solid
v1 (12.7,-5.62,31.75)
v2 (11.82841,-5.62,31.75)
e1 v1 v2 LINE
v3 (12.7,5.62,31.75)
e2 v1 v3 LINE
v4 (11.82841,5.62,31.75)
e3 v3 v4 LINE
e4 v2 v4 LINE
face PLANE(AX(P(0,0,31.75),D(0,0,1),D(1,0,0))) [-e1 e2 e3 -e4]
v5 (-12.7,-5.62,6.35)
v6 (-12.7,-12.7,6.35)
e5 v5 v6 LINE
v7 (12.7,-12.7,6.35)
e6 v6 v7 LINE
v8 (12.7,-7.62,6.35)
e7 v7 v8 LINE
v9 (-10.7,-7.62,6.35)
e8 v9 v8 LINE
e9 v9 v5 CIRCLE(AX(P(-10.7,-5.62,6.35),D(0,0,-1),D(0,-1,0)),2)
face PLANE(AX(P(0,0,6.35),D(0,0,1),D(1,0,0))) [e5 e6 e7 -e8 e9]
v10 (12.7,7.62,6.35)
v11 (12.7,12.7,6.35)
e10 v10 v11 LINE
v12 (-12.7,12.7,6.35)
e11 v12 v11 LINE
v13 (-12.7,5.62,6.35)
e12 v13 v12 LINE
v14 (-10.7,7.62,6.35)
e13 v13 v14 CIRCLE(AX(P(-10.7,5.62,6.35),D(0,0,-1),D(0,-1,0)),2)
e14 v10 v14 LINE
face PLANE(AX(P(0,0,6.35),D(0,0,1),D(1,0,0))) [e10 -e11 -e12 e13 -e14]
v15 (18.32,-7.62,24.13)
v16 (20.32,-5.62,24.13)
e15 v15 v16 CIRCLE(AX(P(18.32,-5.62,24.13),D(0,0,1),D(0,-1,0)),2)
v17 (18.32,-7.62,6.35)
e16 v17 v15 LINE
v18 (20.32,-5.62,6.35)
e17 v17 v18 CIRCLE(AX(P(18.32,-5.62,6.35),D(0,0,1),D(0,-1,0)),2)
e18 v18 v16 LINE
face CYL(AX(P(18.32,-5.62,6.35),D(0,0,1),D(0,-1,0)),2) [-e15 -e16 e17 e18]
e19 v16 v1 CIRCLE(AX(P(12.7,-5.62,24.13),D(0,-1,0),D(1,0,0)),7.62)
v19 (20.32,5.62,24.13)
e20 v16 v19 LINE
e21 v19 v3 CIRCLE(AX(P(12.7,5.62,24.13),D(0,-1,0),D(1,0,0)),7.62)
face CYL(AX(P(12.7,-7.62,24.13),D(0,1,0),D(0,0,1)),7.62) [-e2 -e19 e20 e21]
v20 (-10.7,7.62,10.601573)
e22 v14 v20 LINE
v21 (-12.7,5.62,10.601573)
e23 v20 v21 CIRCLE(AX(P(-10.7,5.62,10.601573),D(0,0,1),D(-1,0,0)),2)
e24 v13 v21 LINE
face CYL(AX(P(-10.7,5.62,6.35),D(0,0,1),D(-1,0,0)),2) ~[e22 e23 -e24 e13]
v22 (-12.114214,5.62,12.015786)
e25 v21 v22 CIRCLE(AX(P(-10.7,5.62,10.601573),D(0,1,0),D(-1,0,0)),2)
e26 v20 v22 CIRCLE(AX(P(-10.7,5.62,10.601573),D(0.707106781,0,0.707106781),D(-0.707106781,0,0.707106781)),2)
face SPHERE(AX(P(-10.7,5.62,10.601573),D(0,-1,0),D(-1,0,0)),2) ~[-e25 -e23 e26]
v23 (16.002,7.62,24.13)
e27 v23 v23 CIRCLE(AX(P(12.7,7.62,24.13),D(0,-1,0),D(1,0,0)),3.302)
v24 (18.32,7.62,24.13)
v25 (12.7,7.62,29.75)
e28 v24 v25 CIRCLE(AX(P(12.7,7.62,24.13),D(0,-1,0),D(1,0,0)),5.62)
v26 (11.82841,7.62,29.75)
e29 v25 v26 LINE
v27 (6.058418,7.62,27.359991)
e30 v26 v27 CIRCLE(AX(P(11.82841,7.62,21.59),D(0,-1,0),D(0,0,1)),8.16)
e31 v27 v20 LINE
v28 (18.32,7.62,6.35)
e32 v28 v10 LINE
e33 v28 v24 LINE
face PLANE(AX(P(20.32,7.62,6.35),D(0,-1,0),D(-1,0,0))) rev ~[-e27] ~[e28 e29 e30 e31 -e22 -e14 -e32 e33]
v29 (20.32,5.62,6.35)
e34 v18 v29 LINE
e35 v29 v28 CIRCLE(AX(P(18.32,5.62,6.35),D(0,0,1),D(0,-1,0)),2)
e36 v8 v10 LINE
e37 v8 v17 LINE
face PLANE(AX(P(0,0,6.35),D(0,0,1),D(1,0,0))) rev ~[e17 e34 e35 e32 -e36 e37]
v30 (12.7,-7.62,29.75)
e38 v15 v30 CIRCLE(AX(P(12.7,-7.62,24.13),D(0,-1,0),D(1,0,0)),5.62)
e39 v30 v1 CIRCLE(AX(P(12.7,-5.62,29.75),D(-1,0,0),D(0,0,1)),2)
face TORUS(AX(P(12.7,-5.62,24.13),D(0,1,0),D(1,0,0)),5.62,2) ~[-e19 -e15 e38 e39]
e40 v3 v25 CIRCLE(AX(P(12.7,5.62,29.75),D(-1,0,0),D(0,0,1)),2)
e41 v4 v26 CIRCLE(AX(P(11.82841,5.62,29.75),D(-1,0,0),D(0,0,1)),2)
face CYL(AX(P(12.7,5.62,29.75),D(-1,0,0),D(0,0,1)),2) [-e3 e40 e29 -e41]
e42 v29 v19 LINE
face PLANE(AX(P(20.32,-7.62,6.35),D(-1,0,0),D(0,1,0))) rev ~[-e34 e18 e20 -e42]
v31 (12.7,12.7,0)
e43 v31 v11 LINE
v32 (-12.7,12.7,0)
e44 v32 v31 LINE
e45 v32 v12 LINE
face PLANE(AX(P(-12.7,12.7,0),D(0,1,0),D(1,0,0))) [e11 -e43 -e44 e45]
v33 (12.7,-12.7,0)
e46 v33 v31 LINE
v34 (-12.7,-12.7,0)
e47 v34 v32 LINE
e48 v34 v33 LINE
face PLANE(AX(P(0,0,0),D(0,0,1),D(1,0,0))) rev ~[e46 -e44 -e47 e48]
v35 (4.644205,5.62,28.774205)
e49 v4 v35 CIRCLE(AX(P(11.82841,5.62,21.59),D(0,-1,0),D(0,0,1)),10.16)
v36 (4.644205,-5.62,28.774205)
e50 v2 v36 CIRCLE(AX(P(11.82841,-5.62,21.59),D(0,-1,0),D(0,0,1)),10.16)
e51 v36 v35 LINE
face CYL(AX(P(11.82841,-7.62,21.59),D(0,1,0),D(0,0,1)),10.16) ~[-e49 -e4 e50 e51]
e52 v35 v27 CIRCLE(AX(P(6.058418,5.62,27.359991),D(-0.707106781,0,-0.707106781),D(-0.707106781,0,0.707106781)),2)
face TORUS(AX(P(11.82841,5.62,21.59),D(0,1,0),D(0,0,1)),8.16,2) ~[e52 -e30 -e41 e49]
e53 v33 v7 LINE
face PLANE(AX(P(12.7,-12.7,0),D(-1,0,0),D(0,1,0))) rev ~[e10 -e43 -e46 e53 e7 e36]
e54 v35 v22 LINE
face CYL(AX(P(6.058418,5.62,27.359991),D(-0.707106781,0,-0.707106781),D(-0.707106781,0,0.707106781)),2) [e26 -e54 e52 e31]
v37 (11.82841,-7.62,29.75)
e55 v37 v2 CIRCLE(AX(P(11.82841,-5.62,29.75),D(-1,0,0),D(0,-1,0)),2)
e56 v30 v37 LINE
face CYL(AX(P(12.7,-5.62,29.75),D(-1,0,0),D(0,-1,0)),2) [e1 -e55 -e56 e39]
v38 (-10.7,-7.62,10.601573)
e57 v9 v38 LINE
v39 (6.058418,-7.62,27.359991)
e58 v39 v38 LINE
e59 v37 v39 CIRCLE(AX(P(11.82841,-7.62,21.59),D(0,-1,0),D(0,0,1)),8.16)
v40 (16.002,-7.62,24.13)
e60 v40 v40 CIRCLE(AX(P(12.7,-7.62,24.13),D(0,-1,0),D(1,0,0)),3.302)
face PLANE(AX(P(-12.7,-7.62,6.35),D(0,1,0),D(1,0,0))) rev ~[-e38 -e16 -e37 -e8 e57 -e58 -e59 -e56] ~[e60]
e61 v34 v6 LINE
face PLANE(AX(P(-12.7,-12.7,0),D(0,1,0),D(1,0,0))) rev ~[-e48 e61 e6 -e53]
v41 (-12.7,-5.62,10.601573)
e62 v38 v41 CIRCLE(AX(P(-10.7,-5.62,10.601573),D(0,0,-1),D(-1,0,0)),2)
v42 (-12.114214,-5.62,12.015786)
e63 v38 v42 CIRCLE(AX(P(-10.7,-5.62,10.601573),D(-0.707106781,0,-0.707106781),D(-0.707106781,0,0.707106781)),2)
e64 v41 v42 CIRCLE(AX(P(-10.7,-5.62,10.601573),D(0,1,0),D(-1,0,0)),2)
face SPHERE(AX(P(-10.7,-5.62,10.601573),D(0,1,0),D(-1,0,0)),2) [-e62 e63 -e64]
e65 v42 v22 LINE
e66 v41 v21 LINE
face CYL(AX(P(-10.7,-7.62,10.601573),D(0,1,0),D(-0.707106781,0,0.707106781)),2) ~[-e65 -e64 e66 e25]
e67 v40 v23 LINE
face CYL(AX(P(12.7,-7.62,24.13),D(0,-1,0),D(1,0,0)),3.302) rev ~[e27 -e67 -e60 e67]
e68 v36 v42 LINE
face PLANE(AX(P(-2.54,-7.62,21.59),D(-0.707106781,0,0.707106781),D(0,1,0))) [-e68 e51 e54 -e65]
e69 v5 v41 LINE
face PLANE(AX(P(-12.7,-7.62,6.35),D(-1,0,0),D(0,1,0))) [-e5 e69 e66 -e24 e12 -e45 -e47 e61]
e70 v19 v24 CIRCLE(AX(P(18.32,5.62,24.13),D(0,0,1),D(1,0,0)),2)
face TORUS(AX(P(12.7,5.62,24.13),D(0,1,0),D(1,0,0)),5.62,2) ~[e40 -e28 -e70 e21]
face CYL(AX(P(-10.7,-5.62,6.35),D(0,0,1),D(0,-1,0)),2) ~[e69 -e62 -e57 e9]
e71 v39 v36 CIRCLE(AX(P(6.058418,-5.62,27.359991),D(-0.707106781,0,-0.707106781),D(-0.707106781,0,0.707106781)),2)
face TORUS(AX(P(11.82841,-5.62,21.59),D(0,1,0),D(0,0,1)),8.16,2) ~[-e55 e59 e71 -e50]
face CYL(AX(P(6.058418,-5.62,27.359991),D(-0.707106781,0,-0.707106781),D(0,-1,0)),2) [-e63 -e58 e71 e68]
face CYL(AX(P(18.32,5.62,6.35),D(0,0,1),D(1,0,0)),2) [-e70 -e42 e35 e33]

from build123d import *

# Parameters (mm, degrees)
F0_W     = 25.4
F0_H     = 25.4
F1_DEPTH = 6.35
F2_W     = 25.4
F2_H     = 15.24
F2_W_2   = 7.62
F3_DEPTH = 25.4
F4_R     = 7.62
F5_SIZE  = 20.32
F6_R     = 10.16
F7_R     = 3.302
F8_DEPTH = 20.321
F9_R     = 2


with BuildPart() as f1:
    # F0 (on Top) → F1 (new body)
    with BuildSketch(Plane.XY):
        Rectangle(F0_W, F0_H)
    extrude(amount=F1_DEPTH)

    # F2 (on face) → F3 (join)
    with BuildSketch(Plane.XY.offset(6.35)):
        Rectangle(F2_W, F2_H)
        with Locations((16.51, 0)):
            Rectangle(F2_W_2, F2_H)
    extrude(amount=F3_DEPTH)

    # F4
    f4_edges = [f1.edges().sort_by_distance(p)[0] for p in [
        (20.32, 0, 31.75),
    ]]
    fillet(f4_edges, radius=F4_R)

    # F5
    f5_edges = [f1.edges().sort_by_distance(p)[0] for p in [
        (-12.7, 0, 31.75),
    ]]
    chamfer(f5_edges, length=F5_SIZE)

    # F6
    f6_edges = [f1.edges().sort_by_distance(p)[0] for p in [
        (7.62, 0, 31.75),
    ]]
    fillet(f6_edges, radius=F6_R)

    # F7 (on face) → F8 (cut, through all)
    with BuildSketch(Plane.XZ.offset(7.62)):
        with Locations((12.7, 24.13)):
            Circle(F7_R)
    extrude(amount=-F8_DEPTH, mode=Mode.SUBTRACT)

    # F9
    f9_edges = [f1.edges().sort_by_distance(p)[0] for p in [
        (-4.027898, -7.62, 20.102102),
        (-4.027898, 7.62, 20.102102),
        (-12.7, 0, 11.43),
        (-12.7, -7.62, 8.89),
        (-12.7, 7.62, 8.89),
        (12.264205, -7.62, 31.75),
        (7.940346, -7.62, 30.976616),
        (18.088154, -7.62, 29.518154),
        (20.32, -7.62, 15.24),
        (12.264205, 7.62, 31.75),
        (7.940346, 7.62, 30.976616),
        (18.088154, 7.62, 29.518154),
        (20.32, 7.62, 15.24),
    ]]
    fillet(f9_edges, radius=F9_R)


solid = f1.part
